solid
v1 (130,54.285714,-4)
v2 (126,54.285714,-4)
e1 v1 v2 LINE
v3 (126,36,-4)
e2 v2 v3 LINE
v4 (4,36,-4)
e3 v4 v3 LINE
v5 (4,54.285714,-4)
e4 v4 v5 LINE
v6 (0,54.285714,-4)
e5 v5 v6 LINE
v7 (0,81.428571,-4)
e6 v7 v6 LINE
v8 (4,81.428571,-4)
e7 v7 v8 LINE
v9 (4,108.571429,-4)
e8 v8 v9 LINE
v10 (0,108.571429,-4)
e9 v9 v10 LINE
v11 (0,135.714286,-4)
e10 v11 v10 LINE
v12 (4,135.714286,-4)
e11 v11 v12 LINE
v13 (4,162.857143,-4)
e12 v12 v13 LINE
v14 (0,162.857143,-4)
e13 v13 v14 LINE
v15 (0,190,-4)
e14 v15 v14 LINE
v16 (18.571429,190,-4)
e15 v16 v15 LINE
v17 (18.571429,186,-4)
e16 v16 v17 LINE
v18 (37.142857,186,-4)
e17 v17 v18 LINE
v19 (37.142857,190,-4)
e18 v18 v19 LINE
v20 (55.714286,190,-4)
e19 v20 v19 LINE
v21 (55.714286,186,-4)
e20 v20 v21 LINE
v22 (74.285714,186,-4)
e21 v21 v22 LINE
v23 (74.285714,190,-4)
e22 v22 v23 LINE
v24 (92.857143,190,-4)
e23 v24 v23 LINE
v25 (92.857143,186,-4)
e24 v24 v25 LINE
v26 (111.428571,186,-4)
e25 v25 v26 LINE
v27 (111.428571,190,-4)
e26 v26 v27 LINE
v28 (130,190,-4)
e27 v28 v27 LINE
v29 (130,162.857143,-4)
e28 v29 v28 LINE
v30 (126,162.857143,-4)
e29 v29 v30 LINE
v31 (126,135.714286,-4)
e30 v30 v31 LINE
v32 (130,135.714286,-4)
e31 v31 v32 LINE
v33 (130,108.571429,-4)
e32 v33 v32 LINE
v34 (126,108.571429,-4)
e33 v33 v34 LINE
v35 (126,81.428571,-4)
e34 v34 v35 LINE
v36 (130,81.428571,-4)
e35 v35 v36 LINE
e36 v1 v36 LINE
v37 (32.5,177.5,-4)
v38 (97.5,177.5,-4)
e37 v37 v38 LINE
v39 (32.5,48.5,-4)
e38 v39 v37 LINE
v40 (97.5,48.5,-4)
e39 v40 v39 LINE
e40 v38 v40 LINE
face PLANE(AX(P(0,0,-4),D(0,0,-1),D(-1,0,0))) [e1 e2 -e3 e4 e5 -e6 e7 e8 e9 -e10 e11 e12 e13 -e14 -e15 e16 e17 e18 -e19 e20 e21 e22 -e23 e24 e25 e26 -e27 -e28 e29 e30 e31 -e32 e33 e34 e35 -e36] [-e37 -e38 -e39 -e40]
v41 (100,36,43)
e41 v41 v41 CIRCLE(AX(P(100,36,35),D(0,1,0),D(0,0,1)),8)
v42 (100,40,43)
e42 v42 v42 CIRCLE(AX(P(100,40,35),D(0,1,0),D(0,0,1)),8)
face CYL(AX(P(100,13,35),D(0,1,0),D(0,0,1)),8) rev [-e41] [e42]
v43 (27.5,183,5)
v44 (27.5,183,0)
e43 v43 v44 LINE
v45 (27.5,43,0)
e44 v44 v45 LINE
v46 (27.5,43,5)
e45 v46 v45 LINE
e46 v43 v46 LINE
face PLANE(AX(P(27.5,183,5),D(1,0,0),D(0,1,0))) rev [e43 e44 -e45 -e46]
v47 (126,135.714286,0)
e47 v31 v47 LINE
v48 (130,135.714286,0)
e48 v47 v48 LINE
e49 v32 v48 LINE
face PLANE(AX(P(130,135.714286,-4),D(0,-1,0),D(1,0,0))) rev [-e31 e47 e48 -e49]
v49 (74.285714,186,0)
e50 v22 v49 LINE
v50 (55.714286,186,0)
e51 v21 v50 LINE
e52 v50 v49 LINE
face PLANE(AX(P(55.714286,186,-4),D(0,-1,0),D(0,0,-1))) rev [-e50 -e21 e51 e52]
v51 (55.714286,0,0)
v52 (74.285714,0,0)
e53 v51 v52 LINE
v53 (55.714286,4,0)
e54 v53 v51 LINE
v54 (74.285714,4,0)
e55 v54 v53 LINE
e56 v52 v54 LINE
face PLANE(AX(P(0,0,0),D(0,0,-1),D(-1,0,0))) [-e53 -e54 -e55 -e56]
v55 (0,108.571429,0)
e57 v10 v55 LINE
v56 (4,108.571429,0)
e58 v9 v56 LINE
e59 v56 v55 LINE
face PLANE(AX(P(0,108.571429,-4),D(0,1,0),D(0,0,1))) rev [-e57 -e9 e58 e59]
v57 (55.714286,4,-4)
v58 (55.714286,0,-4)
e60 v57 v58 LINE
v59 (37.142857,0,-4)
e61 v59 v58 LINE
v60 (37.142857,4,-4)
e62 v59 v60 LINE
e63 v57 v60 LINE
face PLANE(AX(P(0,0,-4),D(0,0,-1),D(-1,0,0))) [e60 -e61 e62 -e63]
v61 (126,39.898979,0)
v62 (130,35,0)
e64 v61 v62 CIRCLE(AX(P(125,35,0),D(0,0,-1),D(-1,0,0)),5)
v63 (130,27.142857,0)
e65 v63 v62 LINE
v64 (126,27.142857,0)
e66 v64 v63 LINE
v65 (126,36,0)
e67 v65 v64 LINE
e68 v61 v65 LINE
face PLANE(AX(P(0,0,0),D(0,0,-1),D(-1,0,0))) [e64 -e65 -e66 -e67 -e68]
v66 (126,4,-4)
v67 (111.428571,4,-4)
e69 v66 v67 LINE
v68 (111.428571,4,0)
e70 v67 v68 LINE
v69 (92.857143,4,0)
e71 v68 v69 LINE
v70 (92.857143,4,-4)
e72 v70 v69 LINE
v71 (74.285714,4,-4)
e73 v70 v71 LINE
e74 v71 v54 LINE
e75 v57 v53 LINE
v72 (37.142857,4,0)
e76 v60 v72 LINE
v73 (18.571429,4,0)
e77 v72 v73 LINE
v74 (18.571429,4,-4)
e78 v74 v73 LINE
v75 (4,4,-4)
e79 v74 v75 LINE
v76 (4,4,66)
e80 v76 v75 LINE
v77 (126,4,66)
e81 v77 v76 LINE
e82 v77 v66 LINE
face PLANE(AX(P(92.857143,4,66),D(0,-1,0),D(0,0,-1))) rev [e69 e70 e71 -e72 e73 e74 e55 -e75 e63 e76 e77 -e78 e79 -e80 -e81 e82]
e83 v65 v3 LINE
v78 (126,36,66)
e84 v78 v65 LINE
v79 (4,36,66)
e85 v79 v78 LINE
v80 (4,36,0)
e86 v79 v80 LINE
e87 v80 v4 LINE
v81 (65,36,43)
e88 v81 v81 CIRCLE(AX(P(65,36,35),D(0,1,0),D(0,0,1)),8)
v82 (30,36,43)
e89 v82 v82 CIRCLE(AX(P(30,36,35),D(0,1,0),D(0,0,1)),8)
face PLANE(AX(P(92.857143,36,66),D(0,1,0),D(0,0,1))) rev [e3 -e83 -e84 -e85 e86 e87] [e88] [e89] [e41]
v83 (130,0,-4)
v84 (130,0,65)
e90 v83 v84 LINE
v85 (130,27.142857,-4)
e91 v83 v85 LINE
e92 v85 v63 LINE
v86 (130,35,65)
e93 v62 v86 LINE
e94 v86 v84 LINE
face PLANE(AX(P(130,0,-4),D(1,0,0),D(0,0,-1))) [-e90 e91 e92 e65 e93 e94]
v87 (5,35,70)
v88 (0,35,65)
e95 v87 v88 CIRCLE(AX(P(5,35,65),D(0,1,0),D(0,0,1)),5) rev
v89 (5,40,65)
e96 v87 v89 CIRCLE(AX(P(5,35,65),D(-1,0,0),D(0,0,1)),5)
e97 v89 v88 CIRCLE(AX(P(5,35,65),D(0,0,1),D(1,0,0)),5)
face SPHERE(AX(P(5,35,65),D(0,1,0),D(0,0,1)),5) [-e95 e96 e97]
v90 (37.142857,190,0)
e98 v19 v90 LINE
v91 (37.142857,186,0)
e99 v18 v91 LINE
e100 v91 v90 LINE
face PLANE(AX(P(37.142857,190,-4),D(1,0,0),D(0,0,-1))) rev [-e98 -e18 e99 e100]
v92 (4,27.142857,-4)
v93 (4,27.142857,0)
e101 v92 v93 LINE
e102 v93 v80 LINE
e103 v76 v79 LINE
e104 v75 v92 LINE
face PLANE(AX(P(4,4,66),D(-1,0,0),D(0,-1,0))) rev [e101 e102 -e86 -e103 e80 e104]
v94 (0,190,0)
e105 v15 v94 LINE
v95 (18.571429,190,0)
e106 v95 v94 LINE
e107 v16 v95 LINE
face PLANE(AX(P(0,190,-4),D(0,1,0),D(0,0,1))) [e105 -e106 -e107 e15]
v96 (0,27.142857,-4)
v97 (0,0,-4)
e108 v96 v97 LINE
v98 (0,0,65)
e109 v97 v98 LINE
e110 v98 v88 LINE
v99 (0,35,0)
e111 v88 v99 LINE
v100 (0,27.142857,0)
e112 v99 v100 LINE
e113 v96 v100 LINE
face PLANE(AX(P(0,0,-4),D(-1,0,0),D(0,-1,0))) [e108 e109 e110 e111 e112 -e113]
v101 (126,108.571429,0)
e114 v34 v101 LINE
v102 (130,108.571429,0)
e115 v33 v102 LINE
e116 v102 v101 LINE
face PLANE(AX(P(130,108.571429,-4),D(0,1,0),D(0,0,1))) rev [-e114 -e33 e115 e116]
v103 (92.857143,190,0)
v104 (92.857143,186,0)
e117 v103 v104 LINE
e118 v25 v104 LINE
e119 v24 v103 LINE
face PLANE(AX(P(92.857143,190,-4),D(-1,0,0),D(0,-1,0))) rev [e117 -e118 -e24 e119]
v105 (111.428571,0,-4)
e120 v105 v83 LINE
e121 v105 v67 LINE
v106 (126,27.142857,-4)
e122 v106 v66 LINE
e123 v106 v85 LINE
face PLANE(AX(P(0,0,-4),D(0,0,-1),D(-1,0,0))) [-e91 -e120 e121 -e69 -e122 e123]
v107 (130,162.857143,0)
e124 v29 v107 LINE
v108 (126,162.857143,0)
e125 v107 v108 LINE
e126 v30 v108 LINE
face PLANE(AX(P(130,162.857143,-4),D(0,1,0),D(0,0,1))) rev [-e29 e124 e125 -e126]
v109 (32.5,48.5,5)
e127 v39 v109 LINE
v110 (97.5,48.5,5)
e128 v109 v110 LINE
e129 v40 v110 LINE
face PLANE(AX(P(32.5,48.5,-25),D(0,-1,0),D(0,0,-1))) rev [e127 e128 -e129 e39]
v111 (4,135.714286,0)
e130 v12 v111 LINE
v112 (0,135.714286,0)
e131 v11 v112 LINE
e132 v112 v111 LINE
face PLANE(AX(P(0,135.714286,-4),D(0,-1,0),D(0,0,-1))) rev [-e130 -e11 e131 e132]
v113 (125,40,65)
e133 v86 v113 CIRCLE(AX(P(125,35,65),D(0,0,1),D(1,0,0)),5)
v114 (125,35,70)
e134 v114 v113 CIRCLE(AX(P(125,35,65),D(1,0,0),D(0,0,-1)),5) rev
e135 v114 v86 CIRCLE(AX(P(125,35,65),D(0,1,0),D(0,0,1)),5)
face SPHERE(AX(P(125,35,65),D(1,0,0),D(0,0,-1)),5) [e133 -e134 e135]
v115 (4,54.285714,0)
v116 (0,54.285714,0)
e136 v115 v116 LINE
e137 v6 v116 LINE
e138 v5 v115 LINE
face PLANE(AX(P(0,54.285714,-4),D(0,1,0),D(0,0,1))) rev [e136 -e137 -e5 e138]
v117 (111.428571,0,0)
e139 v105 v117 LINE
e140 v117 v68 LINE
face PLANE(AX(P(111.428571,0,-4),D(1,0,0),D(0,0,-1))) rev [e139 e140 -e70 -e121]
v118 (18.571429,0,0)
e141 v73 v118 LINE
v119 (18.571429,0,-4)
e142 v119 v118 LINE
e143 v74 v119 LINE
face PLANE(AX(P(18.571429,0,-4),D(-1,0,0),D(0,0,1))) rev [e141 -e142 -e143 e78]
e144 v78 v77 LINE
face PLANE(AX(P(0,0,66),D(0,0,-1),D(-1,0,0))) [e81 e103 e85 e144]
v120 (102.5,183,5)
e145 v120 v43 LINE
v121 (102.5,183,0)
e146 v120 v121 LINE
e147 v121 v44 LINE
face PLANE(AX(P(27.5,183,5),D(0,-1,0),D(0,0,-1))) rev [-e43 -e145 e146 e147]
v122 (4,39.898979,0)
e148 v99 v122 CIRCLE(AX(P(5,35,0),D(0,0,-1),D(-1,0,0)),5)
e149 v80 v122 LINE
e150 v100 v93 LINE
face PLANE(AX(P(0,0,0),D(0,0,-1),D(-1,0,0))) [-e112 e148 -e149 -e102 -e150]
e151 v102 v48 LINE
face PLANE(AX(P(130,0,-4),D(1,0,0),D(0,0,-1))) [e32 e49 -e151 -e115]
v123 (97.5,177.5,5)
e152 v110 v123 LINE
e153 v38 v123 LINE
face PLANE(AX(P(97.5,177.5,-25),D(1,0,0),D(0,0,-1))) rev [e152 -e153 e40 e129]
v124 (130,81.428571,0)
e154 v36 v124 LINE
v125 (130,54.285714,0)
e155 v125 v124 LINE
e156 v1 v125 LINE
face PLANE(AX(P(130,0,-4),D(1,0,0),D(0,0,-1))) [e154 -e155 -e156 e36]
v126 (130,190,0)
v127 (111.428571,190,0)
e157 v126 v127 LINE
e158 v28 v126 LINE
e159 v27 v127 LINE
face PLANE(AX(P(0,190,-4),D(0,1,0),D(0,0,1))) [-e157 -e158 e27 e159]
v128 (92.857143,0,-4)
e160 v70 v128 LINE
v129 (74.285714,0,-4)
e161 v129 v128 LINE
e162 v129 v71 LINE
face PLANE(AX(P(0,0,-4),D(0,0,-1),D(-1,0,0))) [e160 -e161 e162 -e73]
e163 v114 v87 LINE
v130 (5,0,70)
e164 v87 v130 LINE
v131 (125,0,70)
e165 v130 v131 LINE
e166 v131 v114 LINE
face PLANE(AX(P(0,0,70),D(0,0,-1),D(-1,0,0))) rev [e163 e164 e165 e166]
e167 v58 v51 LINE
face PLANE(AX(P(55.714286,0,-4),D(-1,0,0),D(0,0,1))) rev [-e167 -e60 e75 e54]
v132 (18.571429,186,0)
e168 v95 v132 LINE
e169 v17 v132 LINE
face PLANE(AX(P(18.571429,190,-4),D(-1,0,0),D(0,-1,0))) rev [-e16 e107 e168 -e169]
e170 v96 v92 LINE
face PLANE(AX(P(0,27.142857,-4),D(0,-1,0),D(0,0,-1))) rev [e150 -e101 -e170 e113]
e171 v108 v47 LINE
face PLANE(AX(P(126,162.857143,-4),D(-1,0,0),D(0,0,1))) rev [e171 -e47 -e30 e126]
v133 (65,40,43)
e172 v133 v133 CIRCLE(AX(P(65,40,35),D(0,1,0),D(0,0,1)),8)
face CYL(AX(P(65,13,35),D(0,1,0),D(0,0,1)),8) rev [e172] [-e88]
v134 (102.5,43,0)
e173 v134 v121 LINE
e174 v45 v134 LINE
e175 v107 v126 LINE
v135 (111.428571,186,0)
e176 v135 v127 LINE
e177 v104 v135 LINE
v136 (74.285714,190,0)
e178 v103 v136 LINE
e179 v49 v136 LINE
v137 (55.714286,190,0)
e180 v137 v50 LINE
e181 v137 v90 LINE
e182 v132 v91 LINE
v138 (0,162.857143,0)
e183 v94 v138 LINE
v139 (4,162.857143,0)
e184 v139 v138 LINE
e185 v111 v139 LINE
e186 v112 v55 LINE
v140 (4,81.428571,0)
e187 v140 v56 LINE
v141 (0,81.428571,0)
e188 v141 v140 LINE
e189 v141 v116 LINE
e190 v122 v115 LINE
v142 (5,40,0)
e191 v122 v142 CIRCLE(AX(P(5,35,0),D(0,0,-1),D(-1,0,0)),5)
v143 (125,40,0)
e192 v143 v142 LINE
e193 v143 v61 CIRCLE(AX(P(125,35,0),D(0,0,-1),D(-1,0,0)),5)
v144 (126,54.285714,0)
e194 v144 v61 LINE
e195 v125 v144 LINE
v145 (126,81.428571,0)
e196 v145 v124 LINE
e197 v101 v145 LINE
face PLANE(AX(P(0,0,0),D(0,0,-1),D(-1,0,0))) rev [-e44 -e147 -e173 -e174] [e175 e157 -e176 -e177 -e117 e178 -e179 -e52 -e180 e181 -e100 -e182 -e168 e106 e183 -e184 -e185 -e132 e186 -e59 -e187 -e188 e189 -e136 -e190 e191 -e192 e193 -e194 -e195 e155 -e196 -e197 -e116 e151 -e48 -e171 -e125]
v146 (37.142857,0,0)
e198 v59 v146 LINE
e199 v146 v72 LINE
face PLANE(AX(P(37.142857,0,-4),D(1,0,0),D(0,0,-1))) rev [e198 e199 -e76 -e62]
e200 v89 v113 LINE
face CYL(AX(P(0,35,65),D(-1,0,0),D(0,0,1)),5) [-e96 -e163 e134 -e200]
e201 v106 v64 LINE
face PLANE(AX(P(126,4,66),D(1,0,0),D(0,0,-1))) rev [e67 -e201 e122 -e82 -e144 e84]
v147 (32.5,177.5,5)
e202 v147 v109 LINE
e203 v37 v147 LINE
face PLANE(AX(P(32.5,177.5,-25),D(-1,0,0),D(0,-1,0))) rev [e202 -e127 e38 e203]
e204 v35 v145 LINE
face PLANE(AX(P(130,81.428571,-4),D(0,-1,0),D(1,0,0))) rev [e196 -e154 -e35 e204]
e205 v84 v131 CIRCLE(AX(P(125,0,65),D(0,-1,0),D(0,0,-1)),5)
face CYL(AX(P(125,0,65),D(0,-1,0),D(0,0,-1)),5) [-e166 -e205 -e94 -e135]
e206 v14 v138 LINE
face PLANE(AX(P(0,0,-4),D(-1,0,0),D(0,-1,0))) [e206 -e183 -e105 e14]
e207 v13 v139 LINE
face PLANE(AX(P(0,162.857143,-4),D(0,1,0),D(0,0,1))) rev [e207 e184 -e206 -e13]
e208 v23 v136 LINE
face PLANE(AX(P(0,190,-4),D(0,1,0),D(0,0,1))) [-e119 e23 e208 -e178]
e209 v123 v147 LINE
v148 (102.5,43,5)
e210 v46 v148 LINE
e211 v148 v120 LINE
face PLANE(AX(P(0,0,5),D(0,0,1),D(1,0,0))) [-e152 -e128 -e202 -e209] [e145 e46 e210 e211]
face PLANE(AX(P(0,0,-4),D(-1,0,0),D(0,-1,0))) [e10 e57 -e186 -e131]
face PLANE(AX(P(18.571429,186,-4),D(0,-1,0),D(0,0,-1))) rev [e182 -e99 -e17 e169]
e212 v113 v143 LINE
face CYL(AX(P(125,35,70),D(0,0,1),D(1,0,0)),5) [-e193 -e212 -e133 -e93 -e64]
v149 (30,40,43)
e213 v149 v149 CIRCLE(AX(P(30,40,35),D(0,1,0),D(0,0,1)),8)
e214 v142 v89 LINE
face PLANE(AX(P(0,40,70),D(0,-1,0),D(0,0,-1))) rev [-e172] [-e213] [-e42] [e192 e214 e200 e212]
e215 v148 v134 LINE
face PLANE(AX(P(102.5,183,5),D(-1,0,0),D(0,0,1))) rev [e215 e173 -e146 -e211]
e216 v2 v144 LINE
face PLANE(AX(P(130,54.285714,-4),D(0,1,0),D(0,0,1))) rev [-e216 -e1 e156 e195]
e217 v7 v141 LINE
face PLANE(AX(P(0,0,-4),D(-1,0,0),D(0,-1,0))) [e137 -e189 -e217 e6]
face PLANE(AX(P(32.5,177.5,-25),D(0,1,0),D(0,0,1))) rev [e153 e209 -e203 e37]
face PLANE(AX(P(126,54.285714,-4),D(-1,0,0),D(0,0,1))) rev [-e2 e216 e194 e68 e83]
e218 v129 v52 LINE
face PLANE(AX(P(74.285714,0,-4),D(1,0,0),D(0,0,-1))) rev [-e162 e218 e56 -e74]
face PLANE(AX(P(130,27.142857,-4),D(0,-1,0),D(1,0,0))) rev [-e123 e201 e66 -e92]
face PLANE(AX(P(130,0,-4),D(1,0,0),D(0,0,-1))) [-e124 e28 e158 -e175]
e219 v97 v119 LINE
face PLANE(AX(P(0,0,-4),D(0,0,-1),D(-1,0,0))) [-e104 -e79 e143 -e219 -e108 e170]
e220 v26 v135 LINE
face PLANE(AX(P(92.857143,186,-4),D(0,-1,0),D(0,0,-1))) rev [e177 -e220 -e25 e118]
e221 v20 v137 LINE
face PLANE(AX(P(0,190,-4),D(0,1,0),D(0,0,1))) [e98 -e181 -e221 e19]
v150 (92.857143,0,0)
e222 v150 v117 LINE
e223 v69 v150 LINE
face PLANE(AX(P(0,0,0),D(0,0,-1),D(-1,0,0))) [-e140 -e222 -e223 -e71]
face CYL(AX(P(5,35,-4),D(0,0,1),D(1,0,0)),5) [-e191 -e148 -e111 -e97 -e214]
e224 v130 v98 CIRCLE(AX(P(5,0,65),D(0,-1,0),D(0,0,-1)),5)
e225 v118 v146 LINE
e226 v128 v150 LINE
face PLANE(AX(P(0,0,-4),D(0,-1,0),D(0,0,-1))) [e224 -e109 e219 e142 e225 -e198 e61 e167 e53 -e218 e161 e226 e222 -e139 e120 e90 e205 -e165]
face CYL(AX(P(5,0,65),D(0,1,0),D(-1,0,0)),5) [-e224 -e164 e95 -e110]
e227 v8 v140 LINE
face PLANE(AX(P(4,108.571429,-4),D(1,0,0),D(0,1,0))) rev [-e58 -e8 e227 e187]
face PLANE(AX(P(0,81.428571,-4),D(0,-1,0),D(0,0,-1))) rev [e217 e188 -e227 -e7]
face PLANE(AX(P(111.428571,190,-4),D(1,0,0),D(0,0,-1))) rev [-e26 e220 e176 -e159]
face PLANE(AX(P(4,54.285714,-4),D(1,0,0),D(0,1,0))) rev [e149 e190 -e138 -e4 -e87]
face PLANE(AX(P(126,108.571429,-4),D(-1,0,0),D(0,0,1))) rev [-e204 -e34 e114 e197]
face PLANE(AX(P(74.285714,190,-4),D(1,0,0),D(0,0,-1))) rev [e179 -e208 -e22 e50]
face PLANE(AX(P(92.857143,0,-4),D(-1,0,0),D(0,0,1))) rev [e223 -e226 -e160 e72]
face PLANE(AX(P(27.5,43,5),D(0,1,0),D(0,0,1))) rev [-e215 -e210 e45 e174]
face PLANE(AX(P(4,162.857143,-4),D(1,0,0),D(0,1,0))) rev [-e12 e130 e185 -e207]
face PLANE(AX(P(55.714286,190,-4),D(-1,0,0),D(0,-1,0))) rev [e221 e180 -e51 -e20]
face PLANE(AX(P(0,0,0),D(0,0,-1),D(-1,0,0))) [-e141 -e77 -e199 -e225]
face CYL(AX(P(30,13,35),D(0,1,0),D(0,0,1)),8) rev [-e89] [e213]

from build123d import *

# Parameters (mm, degrees)
BUITENAFMETING_RECHTHOEK_W  = 130
BUITENAFMETING_RECHTHOEK_H  = 190
PLAAT_DEPTH                 = 4
TAND_HOR_W                  = 18.571428572
TAND_HOR_H                  = 4
TAND_BOVEN_DEPTH            = 231.252035822
TANDEN_PATROON_BOVEN_COUNT  = 3
TANDEN_PATROON_BOVEN_PITCH  = 37.142857143
TAND_VER_W                  = 4
TAND_VER_H                  = 27.142857143
TAND_LINKS_DEPTH            = 231.252035822
TANDEN_PATROON_LINKS_COUNT  = 3
TANDEN_PATROON_LINKS_PITCH  = 54.285714286
TAND_O_W                    = 18.571428572
TAND_O_H                    = 4
TAND_ONDER_DEPTH            = 231.252035822
TANDEN_PATROON_ONDER_COUNT  = 3
TANDEN_PATROON_ONDER_PITCH  = 37.142857143
TAND_R_W                    = 4
TAND_R_H                    = 27.142857143
TAND_RECHTS_DEPTH           = 231.252035822
TANDEN_PATROON_RECHTS_COUNT = 3
TANDEN_PATROON_RECHTS_PITCH = 54.285714286
SKETCH1_W                   = 130
SKETCH1_H                   = 40
BOSS_EXTRUDE1_DEPTH         = 70
FILLET1_R                   = 5
CUT_EXTRUDE1_DEPTH          = 70
SKETCH4_R                   = 8
CUT_EXTRUDE2_DEPTH          = 27
SKETCH5_W                   = 75
SKETCH5_H                   = 140
BOSS_EXTRUDE2_DEPTH         = 5
SKETCH6_W                   = 65
SKETCH6_H                   = 129
CUT_EXTRUDE3_DEPTH          = 30


with BuildPart() as part:
    # Buitenafmeting Rechthoek → Plaat (new body)
    with BuildSketch(Plane.XY):
        with Locations((65, 95)):
            Rectangle(BUITENAFMETING_RECHTHOEK_W, BUITENAFMETING_RECHTHOEK_H)
    extrude(amount=-PLAAT_DEPTH)

    # Tand Hor → Tand Boven (cut, through all)
    with BuildSketch(Plane.XY):
        with Locations((27.857142857, 188)):
            Rectangle(TAND_HOR_W, TAND_HOR_H)
    tand_boven = extrude(amount=-TAND_BOVEN_DEPTH, mode=Mode.SUBTRACT)

    # Tanden Patroon Boven: Tand Boven ×3
    with Locations(*[(i * TANDEN_PATROON_BOVEN_PITCH, 0, 0) for i in range(1, TANDEN_PATROON_BOVEN_COUNT)]):
        add(tand_boven, mode=Mode.SUBTRACT)

    # Tand Ver → Tand Links (cut, through all)
    with BuildSketch(Plane.XY):
        with Locations((2, 149.285714286)):
            Rectangle(TAND_VER_W, TAND_VER_H)
    tand_links = extrude(amount=-TAND_LINKS_DEPTH, mode=Mode.SUBTRACT)

    # Tanden Patroon Links: Tand Links ×3
    with Locations(*[(0, -i * TANDEN_PATROON_LINKS_PITCH, 0) for i in range(1, TANDEN_PATROON_LINKS_COUNT)]):
        add(tand_links, mode=Mode.SUBTRACT)

    # Tand O → Tand Onder (cut, through all)
    with BuildSketch(Plane.XY):
        with Locations((27.857142857, 2)):
            Rectangle(TAND_O_W, TAND_O_H)
    tand_onder = extrude(amount=-TAND_ONDER_DEPTH, mode=Mode.SUBTRACT)

    # Tanden Patroon Onder: Tand Onder ×3
    with Locations(*[(i * TANDEN_PATROON_ONDER_PITCH, 0, 0) for i in range(1, TANDEN_PATROON_ONDER_COUNT)]):
        add(tand_onder, mode=Mode.SUBTRACT)

    # Tand R → Tand Rechts (cut, through all)
    with BuildSketch(Plane.XY):
        with Locations((128, 149.285714286)):
            Rectangle(TAND_R_W, TAND_R_H)
    tand_rechts = extrude(amount=-TAND_RECHTS_DEPTH, mode=Mode.SUBTRACT)

    # Tanden Patroon Rechts: Tand Rechts ×3
    with Locations(*[(0, -i * TANDEN_PATROON_RECHTS_PITCH, 0) for i in range(1, TANDEN_PATROON_RECHTS_COUNT)]):
        add(tand_rechts, mode=Mode.SUBTRACT)

    # Sketch1 → Boss-Extrude1 (add)
    with BuildSketch(Plane.XY):
        with Locations((65, 20)):
            Rectangle(SKETCH1_W, SKETCH1_H)
    extrude(amount=BOSS_EXTRUDE1_DEPTH)

    # Fillet1
    # the kernel refuses this fillet: 5 mm, written as the material it takes off along each edge
    with BuildSketch(Plane(origin=(5, 35, 65), x_dir=(0, 1, 0), z_dir=(-1, 0, 0))) as fillet1_piece_1_section:
        Polygon((0, 0), (FILLET1_R * 1.02, 0), (FILLET1_R * 1.02, -FILLET1_R * 1.02), (0, -FILLET1_R * 1.02), align=None)
    fillet1_piece_1 = extrude(amount=FILLET1_R * 1.02, mode=Mode.PRIVATE)
    fillet1_piece_1 = fillet1_piece_1 - Plane(origin=(5, 35, 65), x_dir=(0, -0.7071067811865475, -0.7071067811865475), z_dir=(-1, 0, 0)) * Sphere(FILLET1_R, mode=Mode.PRIVATE)
    add(fillet1_piece_1, mode=Mode.SUBTRACT)
    with BuildSketch(Plane(origin=(125, 35, 65), x_dir=(0, 0, 1), z_dir=(0, 1, 0))) as fillet1_piece_2_section:
        Polygon((0, 0), (FILLET1_R * 1.02, 0), (FILLET1_R * 1.02, FILLET1_R * 1.02), (0, FILLET1_R * 1.02), align=None)
    fillet1_piece_2 = extrude(amount=FILLET1_R * 1.02, mode=Mode.PRIVATE)
    fillet1_piece_2 = fillet1_piece_2 - Plane(origin=(125, 35, 65), x_dir=(-0.7071067811865475, 0, -0.7071067811865475), z_dir=(0, 1, 0)) * Sphere(FILLET1_R, mode=Mode.PRIVATE)
    add(fillet1_piece_2, mode=Mode.SUBTRACT)
    with BuildSketch(Plane(origin=(0, 40, 0), x_dir=(0, -1, 0), z_dir=(0, 0, 1)), Plane(origin=(130, 40, 0), x_dir=(-1, 0, 0), z_dir=(0, 0, 1))) as fillet1_piece_3:
        with BuildLine():
            CenterArc((FILLET1_R, FILLET1_R), FILLET1_R, 180, 90)
            Line((0, FILLET1_R), (0, 0))
            Line((0, 0), (FILLET1_R, 0))
        make_face()
    extrude(amount=65, mode=Mode.SUBTRACT)
    with BuildSketch(Plane(origin=(0, 35, 70), x_dir=(0, 0, -1), z_dir=(0, -1, 0))) as fillet1_piece_4:
        with BuildLine():
            CenterArc((FILLET1_R, FILLET1_R), FILLET1_R, 180, 90)
            Line((0, FILLET1_R), (0, 0))
            Line((0, 0), (FILLET1_R, 0))
        make_face()
    extrude(amount=47.5, mode=Mode.SUBTRACT)
    with BuildSketch(Plane(origin=(130, -12.5, 70), x_dir=(-1, 0, 0), z_dir=(0, 1, 0))) as fillet1_piece_5:
        with BuildLine():
            CenterArc((FILLET1_R, -FILLET1_R), FILLET1_R, 90, 90)
            Line((0, -FILLET1_R), (0, 0))
            Line((0, 0), (FILLET1_R, 0))
        make_face()
    extrude(amount=47.5, mode=Mode.SUBTRACT)
    with BuildSketch(Plane(origin=(125, 40, 70), x_dir=(0, 0, -1), z_dir=(-1, 0, 0))) as fillet1_piece_6:
        with BuildLine():
            CenterArc((FILLET1_R, FILLET1_R), FILLET1_R, 180, 90)
            Line((0, FILLET1_R), (0, 0))
            Line((0, 0), (FILLET1_R, 0))
        make_face()
    extrude(amount=120, mode=Mode.SUBTRACT)

    # Sketch2 → Cut-Extrude1 (cut)
    with BuildSketch(Plane(origin=(0, 0, -4), x_dir=(-1, 0, 0), z_dir=(0, 0, -1))):
        Polygon((-92.857142857, 4), (-4, 4), (-4, 36), (-92.857142857, 36), (-126, 36), (-126, 4), align=None)
    extrude(amount=-CUT_EXTRUDE1_DEPTH, mode=Mode.SUBTRACT)

    # Sketch4 → Cut-Extrude2 (cut)
    with BuildSketch(Plane(origin=(0, 40, 0), x_dir=(1, 0, 0), z_dir=(0, 1, 0))):
        with Locations(Location((65, -35, 0), (0, 0, 270))):
            Circle(SKETCH4_R)
        with Locations(Location((100, -35, 0), (0, 0, 270))):
            Circle(SKETCH4_R)
        with Locations(Location((30, -35, 0), (0, 0, 270))):
            Circle(SKETCH4_R)
    extrude(amount=-CUT_EXTRUDE2_DEPTH, mode=Mode.SUBTRACT)

    # Sketch5 → Boss-Extrude2 (add)
    with BuildSketch(Plane.XY):
        with Locations((65, 113)):
            Rectangle(SKETCH5_W, SKETCH5_H)
    extrude(amount=BOSS_EXTRUDE2_DEPTH)

    # Sketch6 → Cut-Extrude3 (cut)
    with BuildSketch(Plane.XY.offset(5)):
        with Locations((65, 113)):
            Rectangle(SKETCH6_W, SKETCH6_H)
    extrude(amount=-CUT_EXTRUDE3_DEPTH, mode=Mode.SUBTRACT)


solid = part.part
